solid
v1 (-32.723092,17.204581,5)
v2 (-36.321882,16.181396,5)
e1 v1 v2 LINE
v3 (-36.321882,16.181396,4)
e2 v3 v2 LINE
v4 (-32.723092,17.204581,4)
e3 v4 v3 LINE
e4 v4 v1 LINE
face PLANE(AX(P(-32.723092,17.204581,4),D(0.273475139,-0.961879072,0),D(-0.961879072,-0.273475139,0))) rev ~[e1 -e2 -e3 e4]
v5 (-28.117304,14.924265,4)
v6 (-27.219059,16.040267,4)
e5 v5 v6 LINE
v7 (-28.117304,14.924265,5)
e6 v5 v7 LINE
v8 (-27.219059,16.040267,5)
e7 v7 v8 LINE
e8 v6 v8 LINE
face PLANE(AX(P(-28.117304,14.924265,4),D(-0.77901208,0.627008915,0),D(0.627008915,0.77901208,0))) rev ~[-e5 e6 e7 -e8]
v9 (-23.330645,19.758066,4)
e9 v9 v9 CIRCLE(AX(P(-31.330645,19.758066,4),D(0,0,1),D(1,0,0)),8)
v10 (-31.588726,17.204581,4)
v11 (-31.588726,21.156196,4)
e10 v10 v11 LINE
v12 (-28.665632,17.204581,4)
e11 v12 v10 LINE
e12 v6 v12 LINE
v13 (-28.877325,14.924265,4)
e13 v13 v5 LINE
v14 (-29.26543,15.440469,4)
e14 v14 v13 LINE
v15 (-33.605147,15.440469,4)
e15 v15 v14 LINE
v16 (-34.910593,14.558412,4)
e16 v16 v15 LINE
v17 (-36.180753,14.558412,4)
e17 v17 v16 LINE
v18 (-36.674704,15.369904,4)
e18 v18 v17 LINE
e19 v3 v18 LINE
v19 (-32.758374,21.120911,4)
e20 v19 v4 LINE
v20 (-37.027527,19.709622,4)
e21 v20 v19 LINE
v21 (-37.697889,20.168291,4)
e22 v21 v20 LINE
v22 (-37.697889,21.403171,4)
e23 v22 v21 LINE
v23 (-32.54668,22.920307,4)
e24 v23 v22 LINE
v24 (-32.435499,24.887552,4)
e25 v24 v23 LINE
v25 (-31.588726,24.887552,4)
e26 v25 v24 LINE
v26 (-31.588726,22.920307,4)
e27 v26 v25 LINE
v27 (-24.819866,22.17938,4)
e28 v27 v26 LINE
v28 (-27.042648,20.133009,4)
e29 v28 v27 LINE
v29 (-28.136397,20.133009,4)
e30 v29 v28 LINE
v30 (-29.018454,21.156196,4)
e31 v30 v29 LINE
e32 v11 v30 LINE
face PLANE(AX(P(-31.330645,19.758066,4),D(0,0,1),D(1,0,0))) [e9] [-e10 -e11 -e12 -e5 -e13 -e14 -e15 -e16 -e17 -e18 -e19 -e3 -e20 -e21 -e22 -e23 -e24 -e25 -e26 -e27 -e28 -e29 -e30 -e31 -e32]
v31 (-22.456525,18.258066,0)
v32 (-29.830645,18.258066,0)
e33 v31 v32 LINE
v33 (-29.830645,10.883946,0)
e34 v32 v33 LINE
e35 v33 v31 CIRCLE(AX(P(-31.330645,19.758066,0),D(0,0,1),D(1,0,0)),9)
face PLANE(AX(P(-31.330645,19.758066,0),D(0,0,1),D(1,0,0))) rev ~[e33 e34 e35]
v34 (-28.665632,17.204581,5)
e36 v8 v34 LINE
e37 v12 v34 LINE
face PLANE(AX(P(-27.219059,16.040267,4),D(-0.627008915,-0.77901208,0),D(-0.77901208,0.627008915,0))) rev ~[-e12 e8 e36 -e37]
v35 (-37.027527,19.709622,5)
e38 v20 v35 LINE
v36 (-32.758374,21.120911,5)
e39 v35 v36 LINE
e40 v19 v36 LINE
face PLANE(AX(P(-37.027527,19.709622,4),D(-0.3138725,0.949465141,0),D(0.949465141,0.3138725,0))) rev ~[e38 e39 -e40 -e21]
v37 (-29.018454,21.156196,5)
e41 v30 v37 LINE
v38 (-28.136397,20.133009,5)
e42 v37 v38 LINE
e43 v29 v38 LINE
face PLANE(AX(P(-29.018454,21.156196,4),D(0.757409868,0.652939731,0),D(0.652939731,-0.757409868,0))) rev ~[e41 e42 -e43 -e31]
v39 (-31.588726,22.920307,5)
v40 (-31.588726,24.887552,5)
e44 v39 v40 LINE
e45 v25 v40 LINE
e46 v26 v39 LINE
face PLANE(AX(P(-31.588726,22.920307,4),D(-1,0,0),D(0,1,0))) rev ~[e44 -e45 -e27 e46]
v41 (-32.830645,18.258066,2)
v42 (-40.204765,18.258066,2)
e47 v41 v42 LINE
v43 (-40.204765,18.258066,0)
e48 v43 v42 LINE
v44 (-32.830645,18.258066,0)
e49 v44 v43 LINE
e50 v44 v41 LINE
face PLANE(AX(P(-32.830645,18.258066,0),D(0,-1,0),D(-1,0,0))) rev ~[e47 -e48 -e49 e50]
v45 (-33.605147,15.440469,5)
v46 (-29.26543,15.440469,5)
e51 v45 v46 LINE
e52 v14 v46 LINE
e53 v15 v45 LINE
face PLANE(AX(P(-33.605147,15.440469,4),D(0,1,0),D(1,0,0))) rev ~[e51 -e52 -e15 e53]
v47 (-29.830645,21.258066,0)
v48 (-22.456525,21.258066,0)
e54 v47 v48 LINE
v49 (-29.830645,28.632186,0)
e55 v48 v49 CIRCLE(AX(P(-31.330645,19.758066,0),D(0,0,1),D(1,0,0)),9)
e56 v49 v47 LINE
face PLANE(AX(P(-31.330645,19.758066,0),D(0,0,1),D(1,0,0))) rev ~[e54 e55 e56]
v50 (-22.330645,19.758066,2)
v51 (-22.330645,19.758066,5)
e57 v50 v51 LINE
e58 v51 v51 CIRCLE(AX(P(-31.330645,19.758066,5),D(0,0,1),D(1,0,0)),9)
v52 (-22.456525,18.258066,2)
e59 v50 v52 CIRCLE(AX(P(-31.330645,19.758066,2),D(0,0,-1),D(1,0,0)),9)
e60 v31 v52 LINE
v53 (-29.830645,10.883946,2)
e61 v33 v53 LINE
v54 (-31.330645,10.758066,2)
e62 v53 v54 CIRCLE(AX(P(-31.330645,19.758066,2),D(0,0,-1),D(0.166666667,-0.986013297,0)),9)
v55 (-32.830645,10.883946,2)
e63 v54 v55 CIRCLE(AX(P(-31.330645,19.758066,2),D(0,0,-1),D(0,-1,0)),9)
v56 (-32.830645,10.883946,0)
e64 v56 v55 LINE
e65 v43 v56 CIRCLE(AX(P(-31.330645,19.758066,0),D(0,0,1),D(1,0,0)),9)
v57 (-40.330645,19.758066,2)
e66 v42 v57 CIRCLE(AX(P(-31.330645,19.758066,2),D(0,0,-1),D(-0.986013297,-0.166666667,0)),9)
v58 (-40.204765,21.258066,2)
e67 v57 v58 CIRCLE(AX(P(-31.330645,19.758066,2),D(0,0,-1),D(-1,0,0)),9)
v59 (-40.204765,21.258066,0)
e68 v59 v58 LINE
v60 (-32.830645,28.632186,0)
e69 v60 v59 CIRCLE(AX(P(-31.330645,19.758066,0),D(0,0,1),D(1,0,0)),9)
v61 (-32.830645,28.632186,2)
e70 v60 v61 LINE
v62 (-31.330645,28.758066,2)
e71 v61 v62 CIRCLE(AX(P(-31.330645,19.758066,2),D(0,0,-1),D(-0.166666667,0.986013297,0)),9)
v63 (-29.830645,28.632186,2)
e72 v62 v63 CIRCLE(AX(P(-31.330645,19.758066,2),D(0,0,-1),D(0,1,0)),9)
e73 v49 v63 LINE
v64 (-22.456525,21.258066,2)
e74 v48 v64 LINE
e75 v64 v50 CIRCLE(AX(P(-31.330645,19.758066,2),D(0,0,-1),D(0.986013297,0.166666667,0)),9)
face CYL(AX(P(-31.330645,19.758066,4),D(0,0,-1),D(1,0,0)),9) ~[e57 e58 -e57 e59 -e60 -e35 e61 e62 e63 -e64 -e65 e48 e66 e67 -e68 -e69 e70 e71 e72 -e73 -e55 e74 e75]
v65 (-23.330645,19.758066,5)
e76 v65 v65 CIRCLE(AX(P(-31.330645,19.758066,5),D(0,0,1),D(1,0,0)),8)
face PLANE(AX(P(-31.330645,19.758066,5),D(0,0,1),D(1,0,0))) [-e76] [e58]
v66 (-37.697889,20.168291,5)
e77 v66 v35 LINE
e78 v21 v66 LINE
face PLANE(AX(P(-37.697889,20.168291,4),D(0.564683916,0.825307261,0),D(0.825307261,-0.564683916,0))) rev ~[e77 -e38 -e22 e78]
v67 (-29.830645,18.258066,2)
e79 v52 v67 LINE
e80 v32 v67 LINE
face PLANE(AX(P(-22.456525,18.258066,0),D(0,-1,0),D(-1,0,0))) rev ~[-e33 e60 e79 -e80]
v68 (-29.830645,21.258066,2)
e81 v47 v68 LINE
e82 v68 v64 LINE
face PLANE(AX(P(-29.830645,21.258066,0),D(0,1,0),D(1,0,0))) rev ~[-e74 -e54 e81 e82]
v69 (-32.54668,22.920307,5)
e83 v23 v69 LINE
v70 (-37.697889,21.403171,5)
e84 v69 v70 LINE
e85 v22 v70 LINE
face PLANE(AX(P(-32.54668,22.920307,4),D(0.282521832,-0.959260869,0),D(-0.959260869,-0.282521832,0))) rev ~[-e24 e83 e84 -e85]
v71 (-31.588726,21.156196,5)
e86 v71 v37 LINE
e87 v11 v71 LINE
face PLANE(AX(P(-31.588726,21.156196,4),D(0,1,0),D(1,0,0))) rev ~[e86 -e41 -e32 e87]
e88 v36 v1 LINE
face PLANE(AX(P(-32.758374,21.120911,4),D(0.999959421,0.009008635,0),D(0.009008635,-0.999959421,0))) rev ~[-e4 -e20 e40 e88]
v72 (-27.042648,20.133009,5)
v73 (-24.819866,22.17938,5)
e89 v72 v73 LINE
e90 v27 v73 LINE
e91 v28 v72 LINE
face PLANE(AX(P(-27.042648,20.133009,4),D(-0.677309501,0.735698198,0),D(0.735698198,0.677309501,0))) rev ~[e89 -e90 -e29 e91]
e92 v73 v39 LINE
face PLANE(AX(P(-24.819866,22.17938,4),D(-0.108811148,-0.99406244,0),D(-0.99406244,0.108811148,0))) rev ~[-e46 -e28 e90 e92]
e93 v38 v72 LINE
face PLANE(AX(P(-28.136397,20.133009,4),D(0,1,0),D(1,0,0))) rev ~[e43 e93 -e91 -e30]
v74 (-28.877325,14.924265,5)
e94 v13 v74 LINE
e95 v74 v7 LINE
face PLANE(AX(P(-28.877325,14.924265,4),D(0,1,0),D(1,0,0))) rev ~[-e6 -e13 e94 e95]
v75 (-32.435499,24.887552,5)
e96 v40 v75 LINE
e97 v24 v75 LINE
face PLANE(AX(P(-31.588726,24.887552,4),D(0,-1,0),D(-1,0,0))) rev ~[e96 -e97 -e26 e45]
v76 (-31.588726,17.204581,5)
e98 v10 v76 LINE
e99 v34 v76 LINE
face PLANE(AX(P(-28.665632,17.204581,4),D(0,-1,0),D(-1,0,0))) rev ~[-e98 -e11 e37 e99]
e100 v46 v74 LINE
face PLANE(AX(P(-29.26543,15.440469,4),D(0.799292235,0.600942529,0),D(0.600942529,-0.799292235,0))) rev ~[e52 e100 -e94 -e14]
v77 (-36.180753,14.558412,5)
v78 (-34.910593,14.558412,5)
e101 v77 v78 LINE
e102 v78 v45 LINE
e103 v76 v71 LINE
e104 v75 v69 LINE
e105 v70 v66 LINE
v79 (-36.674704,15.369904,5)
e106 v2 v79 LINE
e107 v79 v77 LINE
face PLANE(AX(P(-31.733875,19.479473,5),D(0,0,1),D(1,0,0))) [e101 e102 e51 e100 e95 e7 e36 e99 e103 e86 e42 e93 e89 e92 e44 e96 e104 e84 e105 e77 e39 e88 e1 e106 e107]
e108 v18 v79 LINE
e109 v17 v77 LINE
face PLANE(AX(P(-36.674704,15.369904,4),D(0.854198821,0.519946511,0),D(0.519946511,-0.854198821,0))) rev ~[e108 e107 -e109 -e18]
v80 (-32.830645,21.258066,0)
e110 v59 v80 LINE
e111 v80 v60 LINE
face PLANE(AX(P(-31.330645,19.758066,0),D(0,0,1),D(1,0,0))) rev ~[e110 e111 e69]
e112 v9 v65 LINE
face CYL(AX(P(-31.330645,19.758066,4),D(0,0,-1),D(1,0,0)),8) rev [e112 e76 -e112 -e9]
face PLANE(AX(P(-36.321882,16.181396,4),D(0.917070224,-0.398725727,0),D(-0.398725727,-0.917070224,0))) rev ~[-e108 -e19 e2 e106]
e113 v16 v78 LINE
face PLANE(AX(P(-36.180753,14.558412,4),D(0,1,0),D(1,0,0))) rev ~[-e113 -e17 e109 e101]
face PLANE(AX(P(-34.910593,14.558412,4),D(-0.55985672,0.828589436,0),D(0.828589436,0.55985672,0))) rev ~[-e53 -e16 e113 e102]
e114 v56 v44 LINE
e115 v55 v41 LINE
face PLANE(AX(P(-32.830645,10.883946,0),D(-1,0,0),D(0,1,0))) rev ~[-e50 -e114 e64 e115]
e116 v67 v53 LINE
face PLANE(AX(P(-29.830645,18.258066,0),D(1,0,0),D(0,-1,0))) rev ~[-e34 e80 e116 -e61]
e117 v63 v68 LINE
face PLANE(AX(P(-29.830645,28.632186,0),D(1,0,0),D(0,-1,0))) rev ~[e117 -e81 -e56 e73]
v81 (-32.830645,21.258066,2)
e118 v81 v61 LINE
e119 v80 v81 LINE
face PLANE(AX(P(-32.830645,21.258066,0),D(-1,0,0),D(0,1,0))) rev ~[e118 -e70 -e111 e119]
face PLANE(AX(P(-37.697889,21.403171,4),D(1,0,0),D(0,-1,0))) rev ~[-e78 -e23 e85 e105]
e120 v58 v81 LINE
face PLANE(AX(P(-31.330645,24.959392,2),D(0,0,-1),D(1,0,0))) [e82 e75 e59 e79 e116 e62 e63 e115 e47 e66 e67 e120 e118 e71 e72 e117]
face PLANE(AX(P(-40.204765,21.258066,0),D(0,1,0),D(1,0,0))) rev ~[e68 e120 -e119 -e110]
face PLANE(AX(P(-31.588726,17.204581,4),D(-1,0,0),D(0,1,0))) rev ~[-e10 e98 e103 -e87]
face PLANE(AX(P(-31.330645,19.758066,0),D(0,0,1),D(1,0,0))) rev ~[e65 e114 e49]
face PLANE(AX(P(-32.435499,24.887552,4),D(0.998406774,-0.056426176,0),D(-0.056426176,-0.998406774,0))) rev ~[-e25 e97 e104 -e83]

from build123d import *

# Parameters (mm, degrees)
F0_R     = 9
F1_DEPTH = 4
F3_W     = 3
F3_H     = 3
F4_DEPTH = 2
F2_R     = 9
F2_R_2   = 8
F5_DEPTH = 1


with BuildPart() as f1:
    # F0 (on Top) → F1 (new body)
    with BuildSketch(Plane.XY):
        with Locations((-31.3306450844, 19.7580661625)):
            Circle(F0_R)
    extrude(amount=F1_DEPTH)

    # F3 (on face) → F4 (cut)
    with BuildSketch(Plane(origin=(0, 0, 0), x_dir=(1, 0, 0), z_dir=(0, 0, -1))):
        with BuildLine():
            ThreePointArc((-32.8306450844, -28.6321858371), (-32.0832814269, -28.7265408676), (-31.3306450844, -28.7580661625))
            ThreePointArc((-31.3306450844, -28.7580661625), (-30.5780087419, -28.7265408676), (-29.8306450844, -28.6321858371))
            Line((-29.8306450844, -28.6321858371), (-29.8306450844, -21.2580661625))
            Line((-29.8306450844, -21.2580661625), (-32.8306450844, -21.2580661625))
            Line((-32.8306450844, -21.2580661625), (-32.8306450844, -28.6321858371))
        make_face()
        with BuildLine():
            ThreePointArc((-40.204764759, -18.2580661625), (-40.2991197895, -19.0054298199), (-40.3306450844, -19.7580661625))
            ThreePointArc((-40.3306450844, -19.7580661625), (-40.2991197895, -20.510702505), (-40.204764759, -21.2580661625))
            Line((-40.204764759, -21.2580661625), (-32.8306450844, -21.2580661625))
            Line((-32.8306450844, -21.2580661625), (-32.8306450844, -18.2580661625))
            Line((-32.8306450844, -18.2580661625), (-40.204764759, -18.2580661625))
        make_face()
        with Locations((-31.3306450844, -19.7580661625)):
            Rectangle(F3_W, F3_H)
        with BuildLine():
            Line((-29.8306450844, -18.2580661625), (-29.8306450844, -21.2580661625))
            Line((-29.8306450844, -21.2580661625), (-22.4565254097, -21.2580661625))
            ThreePointArc((-22.4565254097, -21.2580661625), (-22.3621703793, -20.510702505), (-22.3306450844, -19.7580661625))
            ThreePointArc((-22.3306450844, -19.7580661625), (-22.3621703793, -19.0054298199), (-22.4565254097, -18.2580661625))
            Line((-22.4565254097, -18.2580661625), (-29.8306450844, -18.2580661625))
        make_face()
        with BuildLine():
            Line((-32.8306450844, -10.8839464878), (-32.8306450844, -18.2580661625))
            Line((-32.8306450844, -18.2580661625), (-29.8306450844, -18.2580661625))
            Line((-29.8306450844, -18.2580661625), (-29.8306450844, -10.8839464878))
            ThreePointArc((-29.8306450844, -10.8839464878), (-30.5780087419, -10.7895914574), (-31.3306450844, -10.7580661625))
            ThreePointArc((-31.3306450844, -10.7580661625), (-32.0832814269, -10.7895914574), (-32.8306450844, -10.8839464878))
        make_face()
    extrude(amount=-F4_DEPTH, mode=Mode.SUBTRACT)

    # F2 (on face) → F5 (join)
    with BuildSketch(Plane.XY.offset(4)):
        with Locations((-31.3306450844, 19.7580661625)):
            Circle(F2_R)
        with Locations((-31.3306450844, 19.7580661625)):
            Circle(F2_R_2, mode=Mode.SUBTRACT)
        Polygon((-31.5887257457, 24.8875524849), (-32.4354991317, 24.8875524849), (-32.5466804206, 22.920306772), (-37.6978889108, 21.4031711221), (-37.6978889108, 20.1682914048), (-37.0275266469, 19.7096224874), (-32.7583737671, 21.1209114641), (-32.7230915427, 17.2045808285), (-36.3218821585, 16.1813963205), (-36.6747044027, 15.3699042276), (-36.1807532609, 14.5584121346), (-34.9105931818, 14.5584121346), (-33.6051471531, 15.4404686764), (-29.2654298246, 15.4404686764), (-28.877325356, 14.9242647582), (-28.1173038363, 14.9242647582), (-27.2190589458, 16.0402674228), (-28.6656320095, 17.2045808285), (-31.5887257457, 17.2045808285), (-31.5887257457, 21.1561955512), (-29.0184542537, 21.1561955512), (-28.1363967806, 20.1330091804), (-27.0426478237, 20.1330091804), (-24.8198658228, 22.1793800592), (-31.5887257457, 22.920306772), align=None)
    extrude(amount=F5_DEPTH)


solid = f1.part
